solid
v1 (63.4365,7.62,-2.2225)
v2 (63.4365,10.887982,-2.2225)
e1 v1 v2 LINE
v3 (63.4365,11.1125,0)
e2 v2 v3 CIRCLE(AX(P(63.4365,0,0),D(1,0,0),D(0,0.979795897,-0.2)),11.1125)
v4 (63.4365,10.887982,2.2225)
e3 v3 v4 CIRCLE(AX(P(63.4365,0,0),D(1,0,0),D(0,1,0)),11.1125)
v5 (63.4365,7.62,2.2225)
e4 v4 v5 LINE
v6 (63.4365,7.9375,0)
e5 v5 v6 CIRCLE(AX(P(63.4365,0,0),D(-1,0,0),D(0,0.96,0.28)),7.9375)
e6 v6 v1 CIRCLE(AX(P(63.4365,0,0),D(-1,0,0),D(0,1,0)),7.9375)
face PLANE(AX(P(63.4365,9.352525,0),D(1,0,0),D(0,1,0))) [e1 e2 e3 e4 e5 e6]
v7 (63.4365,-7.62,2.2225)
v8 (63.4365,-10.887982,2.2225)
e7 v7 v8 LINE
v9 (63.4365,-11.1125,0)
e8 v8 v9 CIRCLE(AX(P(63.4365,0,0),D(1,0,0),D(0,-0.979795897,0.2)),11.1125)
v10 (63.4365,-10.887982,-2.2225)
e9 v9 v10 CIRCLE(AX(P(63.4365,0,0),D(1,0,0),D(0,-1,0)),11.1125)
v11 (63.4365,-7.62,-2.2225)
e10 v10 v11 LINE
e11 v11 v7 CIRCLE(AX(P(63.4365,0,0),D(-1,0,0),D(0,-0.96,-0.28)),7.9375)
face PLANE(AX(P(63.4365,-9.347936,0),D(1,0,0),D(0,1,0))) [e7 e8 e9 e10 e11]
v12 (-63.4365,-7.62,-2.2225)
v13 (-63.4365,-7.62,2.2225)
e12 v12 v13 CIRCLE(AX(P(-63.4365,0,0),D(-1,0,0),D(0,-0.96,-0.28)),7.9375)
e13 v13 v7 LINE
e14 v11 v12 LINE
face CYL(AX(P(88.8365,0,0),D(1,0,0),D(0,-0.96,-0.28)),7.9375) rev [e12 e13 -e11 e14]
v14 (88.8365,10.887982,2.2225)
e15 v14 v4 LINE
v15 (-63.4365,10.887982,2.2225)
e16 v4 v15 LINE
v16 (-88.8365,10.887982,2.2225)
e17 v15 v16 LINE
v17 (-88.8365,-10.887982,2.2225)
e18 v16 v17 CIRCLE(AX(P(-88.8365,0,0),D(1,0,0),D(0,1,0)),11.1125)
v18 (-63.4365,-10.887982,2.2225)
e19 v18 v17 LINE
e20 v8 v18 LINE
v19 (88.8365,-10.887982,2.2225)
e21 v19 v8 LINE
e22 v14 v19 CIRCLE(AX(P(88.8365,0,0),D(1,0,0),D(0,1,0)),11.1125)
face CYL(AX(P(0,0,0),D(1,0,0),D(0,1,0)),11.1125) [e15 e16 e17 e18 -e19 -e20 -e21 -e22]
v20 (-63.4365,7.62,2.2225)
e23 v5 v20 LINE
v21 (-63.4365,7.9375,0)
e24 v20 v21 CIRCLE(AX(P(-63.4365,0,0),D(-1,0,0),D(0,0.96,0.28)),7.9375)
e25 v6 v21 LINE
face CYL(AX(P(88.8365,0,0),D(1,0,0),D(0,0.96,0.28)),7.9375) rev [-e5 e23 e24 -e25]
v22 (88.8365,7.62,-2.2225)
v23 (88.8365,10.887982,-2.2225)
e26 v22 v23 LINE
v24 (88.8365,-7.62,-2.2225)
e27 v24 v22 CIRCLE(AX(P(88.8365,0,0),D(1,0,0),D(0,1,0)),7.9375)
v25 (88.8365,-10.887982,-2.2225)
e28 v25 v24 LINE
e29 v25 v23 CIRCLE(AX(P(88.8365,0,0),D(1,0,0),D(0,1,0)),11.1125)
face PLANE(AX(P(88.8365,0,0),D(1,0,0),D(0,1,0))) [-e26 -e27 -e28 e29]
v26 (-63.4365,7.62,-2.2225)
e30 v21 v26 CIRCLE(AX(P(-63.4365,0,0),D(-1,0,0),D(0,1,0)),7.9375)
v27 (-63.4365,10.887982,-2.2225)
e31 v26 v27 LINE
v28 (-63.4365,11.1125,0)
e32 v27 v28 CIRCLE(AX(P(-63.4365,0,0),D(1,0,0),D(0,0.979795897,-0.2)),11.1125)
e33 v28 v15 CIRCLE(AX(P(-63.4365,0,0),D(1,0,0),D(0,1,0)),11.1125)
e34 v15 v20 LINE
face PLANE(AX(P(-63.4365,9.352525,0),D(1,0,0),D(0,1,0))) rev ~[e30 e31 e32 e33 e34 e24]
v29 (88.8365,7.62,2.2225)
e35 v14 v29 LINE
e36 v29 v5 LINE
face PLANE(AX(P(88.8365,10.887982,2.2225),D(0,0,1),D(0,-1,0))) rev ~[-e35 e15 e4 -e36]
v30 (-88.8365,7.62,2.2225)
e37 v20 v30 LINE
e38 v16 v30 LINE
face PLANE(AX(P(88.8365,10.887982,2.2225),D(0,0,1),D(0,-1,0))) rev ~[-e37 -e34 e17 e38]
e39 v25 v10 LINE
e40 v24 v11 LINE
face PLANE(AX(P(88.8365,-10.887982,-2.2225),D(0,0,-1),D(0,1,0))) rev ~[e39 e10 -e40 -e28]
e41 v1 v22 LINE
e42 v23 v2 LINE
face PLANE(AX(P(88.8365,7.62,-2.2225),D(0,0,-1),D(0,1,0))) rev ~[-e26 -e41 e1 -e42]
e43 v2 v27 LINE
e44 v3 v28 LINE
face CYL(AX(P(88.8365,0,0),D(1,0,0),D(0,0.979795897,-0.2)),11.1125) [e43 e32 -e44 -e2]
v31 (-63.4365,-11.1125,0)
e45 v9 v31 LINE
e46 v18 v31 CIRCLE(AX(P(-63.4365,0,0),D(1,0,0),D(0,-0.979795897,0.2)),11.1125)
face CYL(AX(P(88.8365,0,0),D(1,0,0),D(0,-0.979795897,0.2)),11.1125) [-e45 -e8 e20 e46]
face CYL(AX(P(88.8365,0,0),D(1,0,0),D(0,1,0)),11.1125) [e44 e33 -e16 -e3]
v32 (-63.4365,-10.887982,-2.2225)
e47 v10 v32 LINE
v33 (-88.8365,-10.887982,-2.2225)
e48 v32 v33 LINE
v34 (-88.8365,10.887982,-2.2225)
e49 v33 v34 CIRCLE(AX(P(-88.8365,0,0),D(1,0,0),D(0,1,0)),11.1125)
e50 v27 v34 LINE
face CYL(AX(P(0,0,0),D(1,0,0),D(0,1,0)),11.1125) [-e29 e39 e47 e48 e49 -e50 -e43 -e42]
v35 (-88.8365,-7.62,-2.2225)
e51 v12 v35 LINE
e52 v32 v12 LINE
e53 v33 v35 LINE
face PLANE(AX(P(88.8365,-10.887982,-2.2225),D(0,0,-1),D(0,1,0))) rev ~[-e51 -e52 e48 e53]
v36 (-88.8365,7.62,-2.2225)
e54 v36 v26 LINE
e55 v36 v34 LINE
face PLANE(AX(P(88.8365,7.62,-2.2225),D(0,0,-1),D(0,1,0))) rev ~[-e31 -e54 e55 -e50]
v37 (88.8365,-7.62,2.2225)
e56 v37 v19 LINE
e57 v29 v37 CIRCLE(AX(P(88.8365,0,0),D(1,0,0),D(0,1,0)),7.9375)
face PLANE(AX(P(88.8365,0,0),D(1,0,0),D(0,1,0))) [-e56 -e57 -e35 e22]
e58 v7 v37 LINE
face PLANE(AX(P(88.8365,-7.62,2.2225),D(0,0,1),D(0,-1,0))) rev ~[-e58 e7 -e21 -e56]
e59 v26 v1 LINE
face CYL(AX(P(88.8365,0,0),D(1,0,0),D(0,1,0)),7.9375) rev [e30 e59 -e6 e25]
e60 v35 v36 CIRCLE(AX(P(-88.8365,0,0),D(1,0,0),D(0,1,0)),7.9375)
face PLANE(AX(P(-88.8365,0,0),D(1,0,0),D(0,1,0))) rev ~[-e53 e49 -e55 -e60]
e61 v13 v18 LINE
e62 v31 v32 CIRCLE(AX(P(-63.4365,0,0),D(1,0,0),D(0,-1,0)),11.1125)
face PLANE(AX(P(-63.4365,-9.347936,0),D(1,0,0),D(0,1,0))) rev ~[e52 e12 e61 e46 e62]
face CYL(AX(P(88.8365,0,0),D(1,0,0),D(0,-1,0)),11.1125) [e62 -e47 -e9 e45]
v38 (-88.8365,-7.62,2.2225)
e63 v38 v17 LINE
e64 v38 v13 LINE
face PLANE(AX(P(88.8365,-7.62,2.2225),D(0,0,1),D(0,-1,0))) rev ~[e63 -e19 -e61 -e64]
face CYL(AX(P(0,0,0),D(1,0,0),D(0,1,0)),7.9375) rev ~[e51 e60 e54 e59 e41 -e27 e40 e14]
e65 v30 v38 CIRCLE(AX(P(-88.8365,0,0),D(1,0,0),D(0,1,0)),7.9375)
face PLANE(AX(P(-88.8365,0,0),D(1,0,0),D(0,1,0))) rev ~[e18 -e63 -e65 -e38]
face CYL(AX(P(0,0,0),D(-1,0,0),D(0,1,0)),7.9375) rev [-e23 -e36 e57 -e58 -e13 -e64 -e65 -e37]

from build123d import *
from build123d import SkipClean  # not in build123d's __all__

# Parameters (mm, degrees)
F0_R          = 11.1125
F0_R_2        = 7.9375
F1_DEPTH      = 88.8365
F1_DEPTH_BACK = 88.8365
F3_DEPTH      = 177.674
F4_DEPTH      = 152.273
F5_DEPTH      = 25.4


with BuildPart() as f1:
    # F0 (on Right) → F1 (new body, two sides)
    with BuildSketch(Plane.YZ) as f1_sk:
        Circle(F0_R)
        Circle(F0_R_2, mode=Mode.SUBTRACT)
    extrude(amount=F1_DEPTH)
    extrude(f1_sk.sketch, amount=-F1_DEPTH_BACK)

    # F2 (on face) → F3 (cut, through all)
    with BuildSketch(Plane.YZ.offset(88.8365)):
        with BuildLine():
            Line((-7.62, 2.2225), (-10.8879819067, 2.2225))
            ThreePointArc((-10.8879819067, 2.2225), (-11.0562280003, 1.1169058403), (-11.1125, 0))
            ThreePointArc((-11.1125, 0), (-11.0562280003, -1.1169058403), (-10.8879819067, -2.2225))
            Line((-10.8879819067, -2.2225), (-7.62, -2.2225))
            ThreePointArc((-7.62, -2.2225), (-7.9375, 0), (-7.62, 2.2225))
        make_face()
        with BuildLine():
            ThreePointArc((11.1125, 0), (11.0562280003, 1.1169058403), (10.8879819067, 2.2225))
            Line((10.8879819067, 2.2225), (7.62, 2.2225))
            ThreePointArc((7.62, 2.2225), (7.8577241059, 1.1225320151), (7.9375, 0))
            ThreePointArc((7.9375, 0), (7.8577241059, -1.1225320151), (7.62, -2.2225))
            Line((7.62, -2.2225), (10.8879819067, -2.2225))
            ThreePointArc((10.8879819067, -2.2225), (11.0562280003, -1.1169058403), (11.1125, 0))
        make_face()
    extrude(amount=-F3_DEPTH, mode=Mode.SUBTRACT)

    # F2 (on face) → F4 (join)
    with BuildSketch(Plane.YZ.offset(88.8365)):
        with BuildLine():
            Line((-7.62, 2.2225), (-10.8879819067, 2.2225))
            ThreePointArc((-10.8879819067, 2.2225), (-11.0562280003, 1.1169058403), (-11.1125, 0))
            ThreePointArc((-11.1125, 0), (-11.0562280003, -1.1169058403), (-10.8879819067, -2.2225))
            Line((-10.8879819067, -2.2225), (-7.62, -2.2225))
            ThreePointArc((-7.62, -2.2225), (-7.9375, 0), (-7.62, 2.2225))
        make_face()
        with BuildLine():
            ThreePointArc((11.1125, 0), (11.0562280003, 1.1169058403), (10.8879819067, 2.2225))
            Line((10.8879819067, 2.2225), (7.62, 2.2225))
            ThreePointArc((7.62, 2.2225), (7.8577241059, 1.1225320151), (7.9375, 0))
            ThreePointArc((7.9375, 0), (7.8577241059, -1.1225320151), (7.62, -2.2225))
            Line((7.62, -2.2225), (10.8879819067, -2.2225))
            ThreePointArc((10.8879819067, -2.2225), (11.0562280003, -1.1169058403), (11.1125, 0))
        make_face()
    with SkipClean():  # cleaning this boolean's faces spoils the solid; the shape is the same uncleaned
        extrude(amount=-F4_DEPTH)

    # F2 (on face) → F5 (cut)
    with BuildSketch(Plane.YZ.offset(88.8365)):
        with BuildLine():
            Line((-7.62, 2.2225), (-10.8879819067, 2.2225))
            ThreePointArc((-10.8879819067, 2.2225), (-11.0562280003, 1.1169058403), (-11.1125, 0))
            ThreePointArc((-11.1125, 0), (-11.0562280003, -1.1169058403), (-10.8879819067, -2.2225))
            Line((-10.8879819067, -2.2225), (-7.62, -2.2225))
            ThreePointArc((-7.62, -2.2225), (-7.9375, 0), (-7.62, 2.2225))
        make_face()
        with BuildLine():
            ThreePointArc((11.1125, 0), (11.0562280003, 1.1169058403), (10.8879819067, 2.2225))
            Line((10.8879819067, 2.2225), (7.62, 2.2225))
            ThreePointArc((7.62, 2.2225), (7.8577241059, 1.1225320151), (7.9375, 0))
            ThreePointArc((7.9375, 0), (7.8577241059, -1.1225320151), (7.62, -2.2225))
            Line((7.62, -2.2225), (10.8879819067, -2.2225))
            ThreePointArc((10.8879819067, -2.2225), (11.0562280003, -1.1169058403), (11.1125, 0))
        make_face()
    with SkipClean():  # cleaning this boolean's faces spoils the solid; the shape is the same uncleaned
        extrude(amount=-F5_DEPTH, mode=Mode.SUBTRACT)


solid = f1.part
